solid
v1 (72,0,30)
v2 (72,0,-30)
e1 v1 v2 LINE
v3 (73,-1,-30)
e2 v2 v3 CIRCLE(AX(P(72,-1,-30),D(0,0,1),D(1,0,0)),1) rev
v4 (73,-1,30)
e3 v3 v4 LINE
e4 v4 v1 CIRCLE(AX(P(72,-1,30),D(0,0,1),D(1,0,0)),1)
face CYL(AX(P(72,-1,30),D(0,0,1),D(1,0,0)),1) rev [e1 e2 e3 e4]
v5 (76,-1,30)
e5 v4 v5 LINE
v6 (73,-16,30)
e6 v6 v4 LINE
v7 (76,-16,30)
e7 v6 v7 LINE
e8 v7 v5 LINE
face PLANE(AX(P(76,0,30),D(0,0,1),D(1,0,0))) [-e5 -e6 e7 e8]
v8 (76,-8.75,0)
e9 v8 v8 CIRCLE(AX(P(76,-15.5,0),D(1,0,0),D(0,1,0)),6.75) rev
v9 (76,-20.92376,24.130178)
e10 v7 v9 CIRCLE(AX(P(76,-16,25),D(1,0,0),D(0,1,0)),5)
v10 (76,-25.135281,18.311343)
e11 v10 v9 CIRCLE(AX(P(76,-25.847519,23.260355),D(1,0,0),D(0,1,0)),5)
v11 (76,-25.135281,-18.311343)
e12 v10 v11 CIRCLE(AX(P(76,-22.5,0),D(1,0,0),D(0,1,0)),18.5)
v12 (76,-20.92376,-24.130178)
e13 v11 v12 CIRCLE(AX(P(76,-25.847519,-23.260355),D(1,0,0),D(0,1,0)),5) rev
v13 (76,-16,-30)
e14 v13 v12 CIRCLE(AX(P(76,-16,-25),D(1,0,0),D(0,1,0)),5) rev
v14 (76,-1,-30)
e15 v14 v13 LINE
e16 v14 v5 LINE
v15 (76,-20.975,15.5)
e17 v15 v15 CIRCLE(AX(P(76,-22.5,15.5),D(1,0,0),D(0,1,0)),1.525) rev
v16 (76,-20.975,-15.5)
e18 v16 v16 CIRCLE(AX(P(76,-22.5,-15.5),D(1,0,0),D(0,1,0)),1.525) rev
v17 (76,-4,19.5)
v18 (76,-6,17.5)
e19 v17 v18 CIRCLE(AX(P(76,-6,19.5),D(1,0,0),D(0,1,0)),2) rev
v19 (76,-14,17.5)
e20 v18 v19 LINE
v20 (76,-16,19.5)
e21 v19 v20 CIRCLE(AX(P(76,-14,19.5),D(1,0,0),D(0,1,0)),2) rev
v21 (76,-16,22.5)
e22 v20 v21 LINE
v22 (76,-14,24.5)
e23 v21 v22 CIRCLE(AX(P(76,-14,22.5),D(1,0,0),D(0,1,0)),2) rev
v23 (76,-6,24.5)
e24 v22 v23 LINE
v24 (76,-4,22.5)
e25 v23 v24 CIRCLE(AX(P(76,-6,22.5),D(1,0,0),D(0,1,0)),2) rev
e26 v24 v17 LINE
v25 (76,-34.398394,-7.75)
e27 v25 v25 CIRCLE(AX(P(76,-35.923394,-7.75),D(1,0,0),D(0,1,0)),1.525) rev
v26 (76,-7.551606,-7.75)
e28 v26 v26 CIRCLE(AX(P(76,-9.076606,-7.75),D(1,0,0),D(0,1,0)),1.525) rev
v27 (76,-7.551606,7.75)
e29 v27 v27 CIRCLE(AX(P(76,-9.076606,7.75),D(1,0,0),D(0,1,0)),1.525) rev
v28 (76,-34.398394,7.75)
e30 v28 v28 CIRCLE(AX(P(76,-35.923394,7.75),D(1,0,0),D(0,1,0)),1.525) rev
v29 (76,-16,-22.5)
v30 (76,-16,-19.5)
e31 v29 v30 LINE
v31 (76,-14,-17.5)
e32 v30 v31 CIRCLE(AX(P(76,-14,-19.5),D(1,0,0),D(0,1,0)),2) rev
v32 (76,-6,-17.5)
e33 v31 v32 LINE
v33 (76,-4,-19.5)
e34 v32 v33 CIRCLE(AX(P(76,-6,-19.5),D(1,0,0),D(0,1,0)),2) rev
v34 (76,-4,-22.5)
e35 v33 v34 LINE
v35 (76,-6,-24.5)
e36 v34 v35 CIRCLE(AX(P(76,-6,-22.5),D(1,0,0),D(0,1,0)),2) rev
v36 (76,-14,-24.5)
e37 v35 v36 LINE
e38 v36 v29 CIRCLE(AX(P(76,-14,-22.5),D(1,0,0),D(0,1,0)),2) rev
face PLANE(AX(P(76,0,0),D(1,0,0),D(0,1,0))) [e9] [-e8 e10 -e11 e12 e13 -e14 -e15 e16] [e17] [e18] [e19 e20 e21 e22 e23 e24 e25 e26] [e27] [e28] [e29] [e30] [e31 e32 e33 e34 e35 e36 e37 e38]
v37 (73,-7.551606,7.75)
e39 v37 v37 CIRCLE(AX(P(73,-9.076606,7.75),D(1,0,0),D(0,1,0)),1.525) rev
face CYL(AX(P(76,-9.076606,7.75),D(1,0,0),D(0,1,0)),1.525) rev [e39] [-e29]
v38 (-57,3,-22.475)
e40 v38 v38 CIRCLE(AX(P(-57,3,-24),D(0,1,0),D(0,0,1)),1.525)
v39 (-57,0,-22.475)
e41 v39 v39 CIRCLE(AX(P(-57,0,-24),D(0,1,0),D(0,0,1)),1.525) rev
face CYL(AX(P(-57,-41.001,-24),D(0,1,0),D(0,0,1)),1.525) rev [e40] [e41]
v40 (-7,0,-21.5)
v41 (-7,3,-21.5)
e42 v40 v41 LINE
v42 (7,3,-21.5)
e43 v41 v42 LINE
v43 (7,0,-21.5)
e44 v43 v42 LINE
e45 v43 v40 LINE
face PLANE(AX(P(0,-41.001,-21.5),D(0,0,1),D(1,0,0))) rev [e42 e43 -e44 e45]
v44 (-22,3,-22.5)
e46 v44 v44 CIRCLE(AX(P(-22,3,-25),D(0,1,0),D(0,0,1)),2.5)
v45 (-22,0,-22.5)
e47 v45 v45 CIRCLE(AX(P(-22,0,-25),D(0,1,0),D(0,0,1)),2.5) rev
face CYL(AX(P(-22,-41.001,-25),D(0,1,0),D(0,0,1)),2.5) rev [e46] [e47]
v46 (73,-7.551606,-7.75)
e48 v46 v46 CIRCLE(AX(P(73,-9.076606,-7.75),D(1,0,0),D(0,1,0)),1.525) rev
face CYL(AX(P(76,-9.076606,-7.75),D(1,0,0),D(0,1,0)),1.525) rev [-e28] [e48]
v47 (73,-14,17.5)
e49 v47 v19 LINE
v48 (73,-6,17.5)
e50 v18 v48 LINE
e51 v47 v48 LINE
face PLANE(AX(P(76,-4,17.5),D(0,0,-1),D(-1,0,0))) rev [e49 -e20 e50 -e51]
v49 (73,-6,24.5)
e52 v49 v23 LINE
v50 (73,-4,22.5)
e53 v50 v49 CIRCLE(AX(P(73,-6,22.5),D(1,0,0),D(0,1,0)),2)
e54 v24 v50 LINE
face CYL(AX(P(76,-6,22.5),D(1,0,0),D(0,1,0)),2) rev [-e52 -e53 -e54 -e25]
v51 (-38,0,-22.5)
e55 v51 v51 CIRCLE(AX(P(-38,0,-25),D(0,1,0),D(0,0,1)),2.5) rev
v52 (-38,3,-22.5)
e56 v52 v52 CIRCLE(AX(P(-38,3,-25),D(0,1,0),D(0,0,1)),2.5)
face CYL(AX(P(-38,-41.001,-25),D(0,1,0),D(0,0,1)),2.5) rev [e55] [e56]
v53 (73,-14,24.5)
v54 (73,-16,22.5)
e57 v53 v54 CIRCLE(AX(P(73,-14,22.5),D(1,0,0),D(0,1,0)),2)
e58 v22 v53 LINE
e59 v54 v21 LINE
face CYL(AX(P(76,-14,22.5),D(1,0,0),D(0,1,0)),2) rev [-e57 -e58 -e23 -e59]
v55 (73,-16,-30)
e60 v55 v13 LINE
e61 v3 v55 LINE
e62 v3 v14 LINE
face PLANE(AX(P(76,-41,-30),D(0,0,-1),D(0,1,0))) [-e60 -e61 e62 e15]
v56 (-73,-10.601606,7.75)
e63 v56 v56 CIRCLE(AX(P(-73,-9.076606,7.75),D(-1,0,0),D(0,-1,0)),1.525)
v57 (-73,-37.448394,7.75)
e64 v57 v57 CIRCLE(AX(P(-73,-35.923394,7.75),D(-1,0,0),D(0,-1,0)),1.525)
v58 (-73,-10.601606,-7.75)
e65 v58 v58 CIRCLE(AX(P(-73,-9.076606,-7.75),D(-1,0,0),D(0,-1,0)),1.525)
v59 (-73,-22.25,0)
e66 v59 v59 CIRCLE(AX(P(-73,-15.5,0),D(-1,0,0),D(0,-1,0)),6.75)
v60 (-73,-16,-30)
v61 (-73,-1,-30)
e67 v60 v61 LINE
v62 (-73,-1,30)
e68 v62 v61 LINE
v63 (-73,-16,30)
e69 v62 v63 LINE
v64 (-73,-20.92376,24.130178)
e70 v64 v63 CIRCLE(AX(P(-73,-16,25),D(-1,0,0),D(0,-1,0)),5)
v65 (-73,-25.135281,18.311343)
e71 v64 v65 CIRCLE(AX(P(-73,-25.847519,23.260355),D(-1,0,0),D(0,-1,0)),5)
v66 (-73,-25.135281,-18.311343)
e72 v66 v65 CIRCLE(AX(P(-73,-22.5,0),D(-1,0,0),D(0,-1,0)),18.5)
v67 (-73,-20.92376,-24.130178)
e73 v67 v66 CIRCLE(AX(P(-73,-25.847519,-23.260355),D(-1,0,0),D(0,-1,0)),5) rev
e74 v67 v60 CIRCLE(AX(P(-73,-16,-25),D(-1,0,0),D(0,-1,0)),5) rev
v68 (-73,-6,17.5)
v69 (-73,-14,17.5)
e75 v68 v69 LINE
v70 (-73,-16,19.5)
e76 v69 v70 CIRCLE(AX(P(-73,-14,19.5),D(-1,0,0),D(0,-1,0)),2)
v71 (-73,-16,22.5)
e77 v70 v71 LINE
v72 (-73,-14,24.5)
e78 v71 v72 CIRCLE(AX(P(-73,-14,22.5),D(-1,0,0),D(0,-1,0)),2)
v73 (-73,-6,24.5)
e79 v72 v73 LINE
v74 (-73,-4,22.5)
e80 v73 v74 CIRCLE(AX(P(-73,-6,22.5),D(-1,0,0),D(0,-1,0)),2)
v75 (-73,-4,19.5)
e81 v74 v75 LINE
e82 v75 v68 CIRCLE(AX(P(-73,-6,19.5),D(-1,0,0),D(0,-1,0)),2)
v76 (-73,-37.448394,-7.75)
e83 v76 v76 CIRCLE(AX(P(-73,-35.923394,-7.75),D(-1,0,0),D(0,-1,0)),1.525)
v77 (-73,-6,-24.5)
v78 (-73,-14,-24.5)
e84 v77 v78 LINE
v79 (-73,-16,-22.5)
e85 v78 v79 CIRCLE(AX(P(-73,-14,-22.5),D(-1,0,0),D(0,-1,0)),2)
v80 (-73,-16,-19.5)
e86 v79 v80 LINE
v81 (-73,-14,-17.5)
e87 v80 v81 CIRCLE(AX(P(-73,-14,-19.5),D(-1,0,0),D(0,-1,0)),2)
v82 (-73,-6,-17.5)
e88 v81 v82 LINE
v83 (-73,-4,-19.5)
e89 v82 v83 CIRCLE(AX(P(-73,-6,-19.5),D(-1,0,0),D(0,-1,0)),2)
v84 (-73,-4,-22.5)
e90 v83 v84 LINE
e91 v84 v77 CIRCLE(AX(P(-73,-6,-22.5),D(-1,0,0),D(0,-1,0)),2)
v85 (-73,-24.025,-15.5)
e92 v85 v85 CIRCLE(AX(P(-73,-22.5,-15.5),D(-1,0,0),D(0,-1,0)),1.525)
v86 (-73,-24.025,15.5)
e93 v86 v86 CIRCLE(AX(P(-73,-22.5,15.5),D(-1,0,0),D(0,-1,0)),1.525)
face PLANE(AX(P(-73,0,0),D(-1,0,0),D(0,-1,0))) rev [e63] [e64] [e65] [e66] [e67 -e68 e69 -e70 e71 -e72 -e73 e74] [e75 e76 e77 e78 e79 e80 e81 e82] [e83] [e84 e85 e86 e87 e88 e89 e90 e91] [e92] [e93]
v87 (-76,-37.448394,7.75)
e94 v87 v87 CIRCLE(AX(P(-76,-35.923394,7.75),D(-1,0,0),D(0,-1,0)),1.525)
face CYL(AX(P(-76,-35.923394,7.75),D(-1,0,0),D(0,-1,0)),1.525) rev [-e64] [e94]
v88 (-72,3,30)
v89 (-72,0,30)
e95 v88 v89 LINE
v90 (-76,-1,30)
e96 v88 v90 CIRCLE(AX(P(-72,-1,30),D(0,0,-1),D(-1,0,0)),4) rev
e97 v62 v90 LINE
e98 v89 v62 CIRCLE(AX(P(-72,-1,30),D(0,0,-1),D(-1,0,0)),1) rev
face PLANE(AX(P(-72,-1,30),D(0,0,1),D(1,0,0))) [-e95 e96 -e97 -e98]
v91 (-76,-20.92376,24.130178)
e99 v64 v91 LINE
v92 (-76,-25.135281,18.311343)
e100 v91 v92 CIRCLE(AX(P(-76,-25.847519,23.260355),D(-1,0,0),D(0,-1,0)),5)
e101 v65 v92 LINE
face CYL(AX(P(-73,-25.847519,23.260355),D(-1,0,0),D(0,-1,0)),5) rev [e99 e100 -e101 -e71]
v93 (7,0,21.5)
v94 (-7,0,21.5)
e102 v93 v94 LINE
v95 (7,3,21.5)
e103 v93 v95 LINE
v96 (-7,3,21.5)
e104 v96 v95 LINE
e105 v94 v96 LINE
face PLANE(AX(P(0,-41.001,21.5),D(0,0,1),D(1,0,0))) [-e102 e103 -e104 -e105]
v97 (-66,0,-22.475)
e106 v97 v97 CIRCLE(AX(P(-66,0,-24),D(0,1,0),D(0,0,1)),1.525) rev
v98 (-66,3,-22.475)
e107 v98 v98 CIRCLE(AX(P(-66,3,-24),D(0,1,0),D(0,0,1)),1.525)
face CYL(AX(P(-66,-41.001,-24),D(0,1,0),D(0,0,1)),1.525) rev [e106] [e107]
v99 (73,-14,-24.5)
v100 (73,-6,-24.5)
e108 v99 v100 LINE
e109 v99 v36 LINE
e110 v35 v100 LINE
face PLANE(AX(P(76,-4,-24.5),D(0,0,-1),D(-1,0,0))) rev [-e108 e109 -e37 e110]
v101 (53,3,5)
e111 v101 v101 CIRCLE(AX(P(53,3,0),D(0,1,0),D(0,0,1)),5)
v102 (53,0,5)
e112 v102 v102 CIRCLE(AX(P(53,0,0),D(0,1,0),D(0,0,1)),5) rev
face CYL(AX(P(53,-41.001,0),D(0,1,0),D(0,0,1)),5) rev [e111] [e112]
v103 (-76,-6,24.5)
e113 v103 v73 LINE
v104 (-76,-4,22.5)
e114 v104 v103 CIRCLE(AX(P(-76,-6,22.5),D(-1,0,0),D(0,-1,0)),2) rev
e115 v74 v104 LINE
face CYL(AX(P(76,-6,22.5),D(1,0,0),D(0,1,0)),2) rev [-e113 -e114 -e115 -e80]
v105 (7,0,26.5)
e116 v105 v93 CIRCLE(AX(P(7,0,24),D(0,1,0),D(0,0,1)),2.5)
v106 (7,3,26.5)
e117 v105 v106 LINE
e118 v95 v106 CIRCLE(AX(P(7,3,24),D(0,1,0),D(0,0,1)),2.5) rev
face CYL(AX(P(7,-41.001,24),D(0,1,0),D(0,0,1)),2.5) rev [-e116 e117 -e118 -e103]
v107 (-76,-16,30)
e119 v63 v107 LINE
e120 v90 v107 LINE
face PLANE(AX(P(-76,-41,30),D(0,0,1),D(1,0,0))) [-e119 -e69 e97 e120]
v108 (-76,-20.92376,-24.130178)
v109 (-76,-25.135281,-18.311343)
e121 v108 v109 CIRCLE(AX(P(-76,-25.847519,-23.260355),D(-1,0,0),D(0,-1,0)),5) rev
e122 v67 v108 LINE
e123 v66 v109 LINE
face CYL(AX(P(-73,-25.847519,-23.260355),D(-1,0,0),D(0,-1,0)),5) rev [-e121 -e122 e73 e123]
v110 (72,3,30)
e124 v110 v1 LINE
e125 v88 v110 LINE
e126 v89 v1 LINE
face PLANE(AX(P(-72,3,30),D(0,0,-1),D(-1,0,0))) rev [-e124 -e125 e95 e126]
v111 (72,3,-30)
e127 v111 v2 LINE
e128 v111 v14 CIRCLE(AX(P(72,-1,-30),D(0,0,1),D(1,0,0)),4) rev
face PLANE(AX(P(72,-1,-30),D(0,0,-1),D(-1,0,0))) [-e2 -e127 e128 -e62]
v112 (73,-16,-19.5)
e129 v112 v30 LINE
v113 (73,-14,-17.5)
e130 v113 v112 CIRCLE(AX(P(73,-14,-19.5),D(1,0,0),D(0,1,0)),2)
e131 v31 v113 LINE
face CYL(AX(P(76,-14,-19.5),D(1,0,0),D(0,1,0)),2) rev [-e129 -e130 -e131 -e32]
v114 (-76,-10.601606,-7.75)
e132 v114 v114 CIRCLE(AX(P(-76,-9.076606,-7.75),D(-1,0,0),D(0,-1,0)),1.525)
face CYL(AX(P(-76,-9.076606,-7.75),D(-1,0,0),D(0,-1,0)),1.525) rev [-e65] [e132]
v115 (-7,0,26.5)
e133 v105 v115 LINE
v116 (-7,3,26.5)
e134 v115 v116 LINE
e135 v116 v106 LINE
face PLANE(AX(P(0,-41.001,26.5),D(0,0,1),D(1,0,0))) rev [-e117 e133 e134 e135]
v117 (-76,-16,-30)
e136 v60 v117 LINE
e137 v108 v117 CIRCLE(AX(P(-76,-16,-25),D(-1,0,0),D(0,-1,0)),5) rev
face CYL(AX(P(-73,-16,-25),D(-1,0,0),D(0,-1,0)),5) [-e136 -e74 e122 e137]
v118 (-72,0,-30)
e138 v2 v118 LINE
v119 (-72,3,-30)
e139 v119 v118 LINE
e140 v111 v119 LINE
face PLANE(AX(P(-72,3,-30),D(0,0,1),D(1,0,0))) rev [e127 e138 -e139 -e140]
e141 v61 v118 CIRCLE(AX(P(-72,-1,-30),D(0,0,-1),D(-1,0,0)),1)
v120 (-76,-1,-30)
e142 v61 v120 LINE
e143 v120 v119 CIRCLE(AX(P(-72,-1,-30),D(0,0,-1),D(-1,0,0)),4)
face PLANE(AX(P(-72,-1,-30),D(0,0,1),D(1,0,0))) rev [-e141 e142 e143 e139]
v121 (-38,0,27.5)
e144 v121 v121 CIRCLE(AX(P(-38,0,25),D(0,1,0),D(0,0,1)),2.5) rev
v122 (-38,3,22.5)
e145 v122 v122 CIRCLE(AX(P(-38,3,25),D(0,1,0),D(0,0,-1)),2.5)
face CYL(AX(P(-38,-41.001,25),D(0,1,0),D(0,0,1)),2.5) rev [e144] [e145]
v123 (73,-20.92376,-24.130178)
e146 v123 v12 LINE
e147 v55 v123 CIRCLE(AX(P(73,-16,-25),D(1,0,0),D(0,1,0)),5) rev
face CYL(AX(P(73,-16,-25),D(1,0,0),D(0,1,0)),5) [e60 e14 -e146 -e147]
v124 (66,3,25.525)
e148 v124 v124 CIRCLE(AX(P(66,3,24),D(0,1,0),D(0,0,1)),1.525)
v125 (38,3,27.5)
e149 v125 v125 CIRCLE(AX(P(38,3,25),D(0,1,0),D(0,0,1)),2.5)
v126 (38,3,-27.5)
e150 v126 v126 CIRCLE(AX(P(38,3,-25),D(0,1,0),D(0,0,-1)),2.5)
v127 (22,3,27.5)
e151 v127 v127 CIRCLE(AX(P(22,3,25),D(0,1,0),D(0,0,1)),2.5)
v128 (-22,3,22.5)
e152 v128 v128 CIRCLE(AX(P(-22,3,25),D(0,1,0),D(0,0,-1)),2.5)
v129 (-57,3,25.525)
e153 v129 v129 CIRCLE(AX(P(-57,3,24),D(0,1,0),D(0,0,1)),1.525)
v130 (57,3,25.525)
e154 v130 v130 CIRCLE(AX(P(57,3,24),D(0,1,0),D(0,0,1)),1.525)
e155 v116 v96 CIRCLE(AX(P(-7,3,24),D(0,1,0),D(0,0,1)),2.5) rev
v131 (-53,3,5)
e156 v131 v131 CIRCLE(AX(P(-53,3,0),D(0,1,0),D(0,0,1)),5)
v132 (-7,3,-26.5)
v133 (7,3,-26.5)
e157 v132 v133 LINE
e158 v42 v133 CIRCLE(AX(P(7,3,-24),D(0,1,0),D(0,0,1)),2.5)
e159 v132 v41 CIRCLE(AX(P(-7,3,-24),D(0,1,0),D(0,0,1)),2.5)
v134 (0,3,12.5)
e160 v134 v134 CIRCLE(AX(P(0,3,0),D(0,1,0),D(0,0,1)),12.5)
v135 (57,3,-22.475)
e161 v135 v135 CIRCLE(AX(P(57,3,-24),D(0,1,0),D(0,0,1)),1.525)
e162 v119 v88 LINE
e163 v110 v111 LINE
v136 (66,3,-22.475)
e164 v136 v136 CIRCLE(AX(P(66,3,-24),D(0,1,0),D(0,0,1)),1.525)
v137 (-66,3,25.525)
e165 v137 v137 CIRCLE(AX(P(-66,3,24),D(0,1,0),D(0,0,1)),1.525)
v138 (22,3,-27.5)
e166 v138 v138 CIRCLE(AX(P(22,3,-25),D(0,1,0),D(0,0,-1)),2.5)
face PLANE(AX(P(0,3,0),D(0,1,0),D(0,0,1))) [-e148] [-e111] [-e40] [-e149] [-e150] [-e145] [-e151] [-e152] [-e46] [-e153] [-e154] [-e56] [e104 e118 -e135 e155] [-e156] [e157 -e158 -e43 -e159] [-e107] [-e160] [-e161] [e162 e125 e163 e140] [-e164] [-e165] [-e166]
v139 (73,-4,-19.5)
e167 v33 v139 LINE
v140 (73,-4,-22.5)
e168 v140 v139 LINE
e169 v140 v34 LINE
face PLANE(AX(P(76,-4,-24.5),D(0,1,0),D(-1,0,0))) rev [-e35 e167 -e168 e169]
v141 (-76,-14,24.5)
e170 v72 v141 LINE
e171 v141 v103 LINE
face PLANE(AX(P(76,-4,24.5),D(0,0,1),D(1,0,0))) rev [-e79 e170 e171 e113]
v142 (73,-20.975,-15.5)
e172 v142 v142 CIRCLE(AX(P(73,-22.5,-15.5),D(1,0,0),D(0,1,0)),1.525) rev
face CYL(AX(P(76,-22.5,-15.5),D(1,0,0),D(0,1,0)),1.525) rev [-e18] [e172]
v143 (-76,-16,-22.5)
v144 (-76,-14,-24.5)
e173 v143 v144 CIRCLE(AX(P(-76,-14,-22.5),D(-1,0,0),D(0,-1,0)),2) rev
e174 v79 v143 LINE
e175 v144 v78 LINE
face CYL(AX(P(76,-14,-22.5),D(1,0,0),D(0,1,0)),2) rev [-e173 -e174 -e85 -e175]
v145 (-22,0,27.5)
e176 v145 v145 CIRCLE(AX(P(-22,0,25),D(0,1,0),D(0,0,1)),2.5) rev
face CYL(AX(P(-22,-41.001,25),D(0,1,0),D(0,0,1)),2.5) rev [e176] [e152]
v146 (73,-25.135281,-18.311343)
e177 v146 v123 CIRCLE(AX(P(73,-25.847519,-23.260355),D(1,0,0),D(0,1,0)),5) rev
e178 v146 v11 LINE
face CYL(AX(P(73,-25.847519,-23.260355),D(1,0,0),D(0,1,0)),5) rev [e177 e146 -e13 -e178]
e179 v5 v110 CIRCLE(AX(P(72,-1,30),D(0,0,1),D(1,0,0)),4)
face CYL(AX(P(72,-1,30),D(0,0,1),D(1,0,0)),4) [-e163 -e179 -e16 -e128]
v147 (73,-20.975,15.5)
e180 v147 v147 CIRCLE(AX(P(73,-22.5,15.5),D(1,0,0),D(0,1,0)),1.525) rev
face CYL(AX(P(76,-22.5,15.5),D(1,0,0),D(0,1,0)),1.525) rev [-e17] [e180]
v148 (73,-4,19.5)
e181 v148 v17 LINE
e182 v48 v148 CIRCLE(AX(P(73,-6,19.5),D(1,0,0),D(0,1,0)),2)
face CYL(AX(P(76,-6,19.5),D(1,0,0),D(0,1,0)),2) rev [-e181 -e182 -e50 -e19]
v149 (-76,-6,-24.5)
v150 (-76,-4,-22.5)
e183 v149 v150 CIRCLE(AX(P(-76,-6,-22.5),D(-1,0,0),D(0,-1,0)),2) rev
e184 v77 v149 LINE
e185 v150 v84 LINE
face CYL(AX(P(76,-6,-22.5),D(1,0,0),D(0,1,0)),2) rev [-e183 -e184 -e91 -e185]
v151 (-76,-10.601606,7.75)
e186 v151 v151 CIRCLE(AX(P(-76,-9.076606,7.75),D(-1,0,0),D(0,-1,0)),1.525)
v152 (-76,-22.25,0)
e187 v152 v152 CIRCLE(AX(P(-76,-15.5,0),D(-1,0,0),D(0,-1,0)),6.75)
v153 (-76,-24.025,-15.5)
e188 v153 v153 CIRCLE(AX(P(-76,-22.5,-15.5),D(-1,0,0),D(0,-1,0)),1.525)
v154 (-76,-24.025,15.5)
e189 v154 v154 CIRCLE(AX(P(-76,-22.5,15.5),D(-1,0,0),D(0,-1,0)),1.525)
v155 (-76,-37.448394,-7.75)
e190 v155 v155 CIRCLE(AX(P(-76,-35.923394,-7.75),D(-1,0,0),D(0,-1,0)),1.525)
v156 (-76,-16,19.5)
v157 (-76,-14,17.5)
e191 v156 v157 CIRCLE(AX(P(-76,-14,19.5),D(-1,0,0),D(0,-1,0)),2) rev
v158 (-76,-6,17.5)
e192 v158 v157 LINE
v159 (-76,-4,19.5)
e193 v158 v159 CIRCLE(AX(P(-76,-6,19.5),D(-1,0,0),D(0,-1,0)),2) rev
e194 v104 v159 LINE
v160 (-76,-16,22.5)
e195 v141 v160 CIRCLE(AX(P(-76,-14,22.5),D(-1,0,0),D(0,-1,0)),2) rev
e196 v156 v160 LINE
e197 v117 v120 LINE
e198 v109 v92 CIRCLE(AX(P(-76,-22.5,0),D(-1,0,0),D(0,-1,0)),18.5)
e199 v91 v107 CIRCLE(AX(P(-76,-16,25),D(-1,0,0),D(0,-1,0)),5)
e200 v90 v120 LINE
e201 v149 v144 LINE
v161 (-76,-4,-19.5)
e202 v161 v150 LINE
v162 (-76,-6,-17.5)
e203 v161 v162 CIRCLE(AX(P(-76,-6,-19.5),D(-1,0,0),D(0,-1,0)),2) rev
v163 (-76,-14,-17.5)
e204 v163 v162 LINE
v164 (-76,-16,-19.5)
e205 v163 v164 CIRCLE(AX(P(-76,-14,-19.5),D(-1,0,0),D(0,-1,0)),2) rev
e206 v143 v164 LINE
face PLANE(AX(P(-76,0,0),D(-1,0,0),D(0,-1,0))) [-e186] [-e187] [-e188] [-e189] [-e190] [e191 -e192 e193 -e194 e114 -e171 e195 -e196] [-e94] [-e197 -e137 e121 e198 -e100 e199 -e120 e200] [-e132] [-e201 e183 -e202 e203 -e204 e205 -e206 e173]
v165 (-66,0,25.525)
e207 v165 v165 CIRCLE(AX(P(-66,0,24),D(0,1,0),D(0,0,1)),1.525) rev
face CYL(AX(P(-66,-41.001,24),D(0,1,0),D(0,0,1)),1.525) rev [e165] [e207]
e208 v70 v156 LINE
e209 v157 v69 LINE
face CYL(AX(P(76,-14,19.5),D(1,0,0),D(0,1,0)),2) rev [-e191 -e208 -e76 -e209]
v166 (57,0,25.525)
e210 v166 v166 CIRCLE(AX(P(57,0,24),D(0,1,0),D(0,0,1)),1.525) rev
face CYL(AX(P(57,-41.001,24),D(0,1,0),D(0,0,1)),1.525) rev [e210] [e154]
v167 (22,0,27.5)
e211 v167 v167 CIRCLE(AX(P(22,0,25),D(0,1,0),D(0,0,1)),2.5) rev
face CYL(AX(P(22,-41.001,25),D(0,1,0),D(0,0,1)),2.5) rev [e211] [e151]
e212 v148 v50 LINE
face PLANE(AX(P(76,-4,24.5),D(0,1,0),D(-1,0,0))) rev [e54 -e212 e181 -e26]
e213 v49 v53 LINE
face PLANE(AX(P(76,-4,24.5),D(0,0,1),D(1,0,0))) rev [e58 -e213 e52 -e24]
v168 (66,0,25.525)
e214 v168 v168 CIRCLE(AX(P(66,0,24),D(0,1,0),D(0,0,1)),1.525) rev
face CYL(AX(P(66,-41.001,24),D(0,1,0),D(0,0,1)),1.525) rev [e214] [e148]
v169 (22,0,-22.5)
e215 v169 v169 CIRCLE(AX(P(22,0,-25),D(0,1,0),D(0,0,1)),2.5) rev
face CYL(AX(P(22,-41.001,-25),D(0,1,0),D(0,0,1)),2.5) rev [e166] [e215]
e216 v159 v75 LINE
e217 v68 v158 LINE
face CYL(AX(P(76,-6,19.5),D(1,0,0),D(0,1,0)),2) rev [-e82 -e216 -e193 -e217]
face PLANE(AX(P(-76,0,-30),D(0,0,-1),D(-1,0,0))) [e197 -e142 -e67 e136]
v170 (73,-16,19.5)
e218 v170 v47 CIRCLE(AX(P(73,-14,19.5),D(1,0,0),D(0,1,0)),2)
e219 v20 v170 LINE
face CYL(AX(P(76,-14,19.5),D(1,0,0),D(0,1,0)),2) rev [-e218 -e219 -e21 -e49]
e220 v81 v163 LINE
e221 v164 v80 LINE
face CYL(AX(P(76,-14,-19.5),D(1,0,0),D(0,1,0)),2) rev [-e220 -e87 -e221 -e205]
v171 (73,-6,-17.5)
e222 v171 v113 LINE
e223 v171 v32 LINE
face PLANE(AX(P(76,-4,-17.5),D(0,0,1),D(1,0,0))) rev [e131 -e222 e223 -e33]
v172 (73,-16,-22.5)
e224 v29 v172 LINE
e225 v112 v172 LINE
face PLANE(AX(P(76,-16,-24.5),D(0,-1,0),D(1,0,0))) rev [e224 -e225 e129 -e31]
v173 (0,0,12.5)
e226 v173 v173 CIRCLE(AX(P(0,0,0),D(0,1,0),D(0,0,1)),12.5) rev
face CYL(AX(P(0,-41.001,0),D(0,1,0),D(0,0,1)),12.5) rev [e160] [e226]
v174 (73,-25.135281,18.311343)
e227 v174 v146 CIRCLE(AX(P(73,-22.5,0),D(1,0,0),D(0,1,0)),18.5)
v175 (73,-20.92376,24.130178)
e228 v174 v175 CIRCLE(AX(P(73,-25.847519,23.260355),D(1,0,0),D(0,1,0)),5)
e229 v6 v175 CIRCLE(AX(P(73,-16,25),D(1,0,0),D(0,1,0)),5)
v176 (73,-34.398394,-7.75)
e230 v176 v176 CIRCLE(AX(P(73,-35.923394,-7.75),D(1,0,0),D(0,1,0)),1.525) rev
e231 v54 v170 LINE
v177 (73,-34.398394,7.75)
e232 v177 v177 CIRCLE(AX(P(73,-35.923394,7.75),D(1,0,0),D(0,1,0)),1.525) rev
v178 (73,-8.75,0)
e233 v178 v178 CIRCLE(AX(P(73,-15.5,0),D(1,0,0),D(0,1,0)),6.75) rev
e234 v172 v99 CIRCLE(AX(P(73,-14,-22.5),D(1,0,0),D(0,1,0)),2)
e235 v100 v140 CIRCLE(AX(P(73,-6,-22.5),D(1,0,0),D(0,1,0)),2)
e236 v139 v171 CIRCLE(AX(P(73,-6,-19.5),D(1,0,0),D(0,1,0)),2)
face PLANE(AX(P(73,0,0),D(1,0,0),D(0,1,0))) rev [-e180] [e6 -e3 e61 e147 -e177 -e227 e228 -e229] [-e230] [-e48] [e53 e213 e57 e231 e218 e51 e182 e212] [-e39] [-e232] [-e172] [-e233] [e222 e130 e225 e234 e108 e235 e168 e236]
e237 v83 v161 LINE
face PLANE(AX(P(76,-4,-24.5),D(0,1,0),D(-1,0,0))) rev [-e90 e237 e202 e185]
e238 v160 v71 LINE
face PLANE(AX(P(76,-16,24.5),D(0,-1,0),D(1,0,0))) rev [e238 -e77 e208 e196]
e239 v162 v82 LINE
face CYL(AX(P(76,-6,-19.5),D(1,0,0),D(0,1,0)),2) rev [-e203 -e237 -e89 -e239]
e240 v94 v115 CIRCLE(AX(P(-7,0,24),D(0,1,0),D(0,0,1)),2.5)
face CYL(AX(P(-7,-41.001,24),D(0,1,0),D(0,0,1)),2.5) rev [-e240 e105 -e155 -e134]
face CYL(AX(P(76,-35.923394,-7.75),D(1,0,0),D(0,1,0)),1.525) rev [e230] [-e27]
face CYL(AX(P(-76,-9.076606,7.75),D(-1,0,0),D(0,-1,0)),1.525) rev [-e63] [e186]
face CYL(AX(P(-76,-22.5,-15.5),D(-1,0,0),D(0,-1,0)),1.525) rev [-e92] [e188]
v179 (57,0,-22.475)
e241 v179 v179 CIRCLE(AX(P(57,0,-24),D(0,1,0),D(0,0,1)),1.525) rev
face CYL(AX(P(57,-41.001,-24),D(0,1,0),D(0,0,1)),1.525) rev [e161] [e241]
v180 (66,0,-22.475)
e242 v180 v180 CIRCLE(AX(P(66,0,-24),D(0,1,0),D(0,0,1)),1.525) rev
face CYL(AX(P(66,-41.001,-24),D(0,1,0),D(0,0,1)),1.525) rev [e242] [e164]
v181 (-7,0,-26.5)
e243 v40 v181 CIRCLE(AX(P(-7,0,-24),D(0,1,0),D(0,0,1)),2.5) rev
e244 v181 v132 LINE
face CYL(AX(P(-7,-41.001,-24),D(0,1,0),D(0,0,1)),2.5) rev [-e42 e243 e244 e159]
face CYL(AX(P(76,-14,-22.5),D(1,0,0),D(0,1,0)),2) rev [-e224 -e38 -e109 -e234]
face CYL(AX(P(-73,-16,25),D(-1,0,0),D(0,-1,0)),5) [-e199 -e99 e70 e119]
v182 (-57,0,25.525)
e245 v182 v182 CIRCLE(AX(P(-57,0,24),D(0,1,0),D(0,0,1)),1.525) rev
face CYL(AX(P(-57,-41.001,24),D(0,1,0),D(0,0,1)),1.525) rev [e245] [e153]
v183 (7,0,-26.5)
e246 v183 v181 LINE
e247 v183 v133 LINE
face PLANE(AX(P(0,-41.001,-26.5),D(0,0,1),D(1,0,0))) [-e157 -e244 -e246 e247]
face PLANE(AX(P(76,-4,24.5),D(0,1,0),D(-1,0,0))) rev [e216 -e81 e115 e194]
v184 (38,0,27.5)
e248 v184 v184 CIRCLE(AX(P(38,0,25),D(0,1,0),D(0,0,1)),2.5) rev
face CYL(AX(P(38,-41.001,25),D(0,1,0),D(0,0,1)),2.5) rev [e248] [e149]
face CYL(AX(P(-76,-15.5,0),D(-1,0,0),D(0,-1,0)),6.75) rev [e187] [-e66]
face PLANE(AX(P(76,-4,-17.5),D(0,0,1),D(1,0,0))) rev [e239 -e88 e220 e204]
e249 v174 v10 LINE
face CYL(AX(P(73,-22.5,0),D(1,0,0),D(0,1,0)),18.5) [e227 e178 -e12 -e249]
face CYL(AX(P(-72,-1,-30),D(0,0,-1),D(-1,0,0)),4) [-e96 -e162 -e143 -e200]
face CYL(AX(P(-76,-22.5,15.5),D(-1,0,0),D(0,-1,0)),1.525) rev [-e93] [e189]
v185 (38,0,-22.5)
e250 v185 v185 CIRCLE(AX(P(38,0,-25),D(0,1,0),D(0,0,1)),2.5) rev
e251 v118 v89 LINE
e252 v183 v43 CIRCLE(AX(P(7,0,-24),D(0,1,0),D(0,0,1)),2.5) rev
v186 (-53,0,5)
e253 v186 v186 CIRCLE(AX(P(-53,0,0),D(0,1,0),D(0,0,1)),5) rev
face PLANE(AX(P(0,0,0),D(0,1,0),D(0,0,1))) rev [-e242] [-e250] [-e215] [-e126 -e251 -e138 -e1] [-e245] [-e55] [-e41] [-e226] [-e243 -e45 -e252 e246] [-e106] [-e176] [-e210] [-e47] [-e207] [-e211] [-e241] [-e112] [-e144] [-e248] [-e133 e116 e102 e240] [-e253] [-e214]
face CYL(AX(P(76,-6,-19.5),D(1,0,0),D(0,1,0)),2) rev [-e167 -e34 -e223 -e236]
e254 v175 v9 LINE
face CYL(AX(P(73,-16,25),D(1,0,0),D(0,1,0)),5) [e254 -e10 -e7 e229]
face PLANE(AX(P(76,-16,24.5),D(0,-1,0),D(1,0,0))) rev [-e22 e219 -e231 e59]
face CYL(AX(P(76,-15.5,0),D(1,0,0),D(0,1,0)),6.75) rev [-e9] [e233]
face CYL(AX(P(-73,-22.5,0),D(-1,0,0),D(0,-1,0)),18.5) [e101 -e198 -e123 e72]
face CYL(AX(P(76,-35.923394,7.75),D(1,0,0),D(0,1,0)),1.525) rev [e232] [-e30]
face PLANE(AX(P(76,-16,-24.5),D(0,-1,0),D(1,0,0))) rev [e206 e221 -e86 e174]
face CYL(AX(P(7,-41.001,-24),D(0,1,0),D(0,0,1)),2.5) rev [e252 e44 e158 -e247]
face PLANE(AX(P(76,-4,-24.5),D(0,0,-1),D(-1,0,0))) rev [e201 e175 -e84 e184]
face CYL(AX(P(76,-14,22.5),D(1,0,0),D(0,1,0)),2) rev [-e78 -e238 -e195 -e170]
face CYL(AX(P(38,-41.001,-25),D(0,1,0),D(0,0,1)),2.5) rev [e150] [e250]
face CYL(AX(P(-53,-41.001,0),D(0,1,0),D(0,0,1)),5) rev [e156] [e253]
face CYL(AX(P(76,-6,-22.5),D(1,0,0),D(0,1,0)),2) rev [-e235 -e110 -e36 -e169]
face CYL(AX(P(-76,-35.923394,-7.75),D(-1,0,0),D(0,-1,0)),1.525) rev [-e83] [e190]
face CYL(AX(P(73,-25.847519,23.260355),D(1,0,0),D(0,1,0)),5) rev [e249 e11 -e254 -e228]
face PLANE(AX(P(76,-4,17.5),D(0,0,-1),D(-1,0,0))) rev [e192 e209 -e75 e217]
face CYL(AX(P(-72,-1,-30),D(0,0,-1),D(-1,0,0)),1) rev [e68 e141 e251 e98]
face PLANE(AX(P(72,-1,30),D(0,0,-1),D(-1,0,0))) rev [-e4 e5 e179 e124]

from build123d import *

# Parameters (mm, degrees)
SKETCH_1_W             = 144
SKETCH_1_H             = 60
SM_BASE_FLANGE_1_DEPTH = 3
SM_EDGE_FLANGE_1_DEPTH = 60
SM_EDGE_FLANGE_2_DEPTH = 60
CUT_EXTRUDE_1_REACH    = 162.265
SKETCH_16_R            = 1.525
SKETCH_16_R_2          = 6.75
CUT_EXTRUDE_2_REACH    = 94.801
SKETCH_19_W            = 14
SKETCH_19_H            = 5
CUT_EXTRUDE_3_REACH    = 94.801
SKETCH_22_R            = 1.525
CUT_EXTRUDE_4_REACH    = 94.801
SKETCH_25_R            = 2.5
CUT_EXTRUDE_5_REACH    = 94.801
SKETCH_28_R            = 12.5
SKETCH_28_R_2          = 5
SKETCH_29_W            = 7
SKETCH_29_H            = 12
CUT_EXTRUDE_6_DEPTH    = 161.265404876
FILLET_1_R             = 2
FILLET_2_R             = 2


# Sheet-metal steps are written as plain solids
with BuildPart() as part:
    # Sketch 1 → 基体-法兰1 (new body)
    with BuildSketch(Plane(origin=(0, 0, 0), x_dir=(1, 0, 0), z_dir=(0, 1, 0))):
        Rectangle(SKETCH_1_W, SKETCH_1_H)
    extrude(amount=SM_BASE_FLANGE_1_DEPTH)

    # 边线-法兰1 section (across the edge) → 边线-法兰1 (add)
    with BuildSketch(Plane(origin=(73, 0, -30), x_dir=(-1, 0, 0), z_dir=(0, 0, 1))):
        with BuildLine():
            Line((-3, 1), (-3, 41))
            Line((-3, 41), (0, 41))
            Line((0, 41), (0, 1))
            ThreePointArc((0, 1), (0.292893219, 0.292893219), (1, 0))
            Line((1, 0), (1, -3))
            ThreePointArc((1, -3), (-1.828427125, -1.828427125), (-3, 1))
        make_face()
    extrude(amount=SM_EDGE_FLANGE_1_DEPTH)

    # 边线-法兰2 section (across the edge) → 边线-法兰2 (add)
    with BuildSketch(Plane(origin=(-73, 0, 30), x_dir=(1, 0, 0), z_dir=(0, 0, -1))):
        with BuildLine():
            Line((-3, 1), (-3, 41))
            Line((-3, 41), (0, 41))
            Line((0, 41), (0, 1))
            ThreePointArc((0, 1), (0.292893219, 0.292893219), (1, 0))
            Line((1, 0), (1, -3))
            ThreePointArc((1, -3), (-1.828427125, -1.828427125), (-3, 1))
        make_face()
    extrude(amount=SM_EDGE_FLANGE_2_DEPTH)

    # 切除-拉伸1: up to this face of the body (flat: up to its plane)
    cut_extrude_1_end = Plane(part.part.faces().sort_by_distance((76, -21, 0))[0])
    # 草图16 → 切除-拉伸1 (cut, up to the picked face)
    with BuildSketch(Plane.ZY.offset(76), mode=Mode.PRIVATE) as cut_extrude_1_sk1:
        with Locations(Location((15.5, -22.5, 0), (0, 0, 90))):
            Circle(SKETCH_16_R)
    cut_extrude_1_tool1 = split(extrude(cut_extrude_1_sk1.sketch, amount=-CUT_EXTRUDE_1_REACH, mode=Mode.PRIVATE), bisect_by=cut_extrude_1_end, keep=Keep.BOTH, mode=Mode.PRIVATE)
    # 草图16 → 切除-拉伸1 (cut, up to the picked face)
    with BuildSketch(Plane.ZY.offset(76), mode=Mode.PRIVATE) as cut_extrude_1_sk2:
        with Locations(Location((7.75, -35.923393759, 0), (0, 0, 90))):
            Circle(SKETCH_16_R)
    cut_extrude_1_tool2 = split(extrude(cut_extrude_1_sk2.sketch, amount=-CUT_EXTRUDE_1_REACH, mode=Mode.PRIVATE), bisect_by=cut_extrude_1_end, keep=Keep.BOTH, mode=Mode.PRIVATE)
    # 草图16 → 切除-拉伸1 (cut, up to the picked face)
    with BuildSketch(Plane.ZY.offset(76), mode=Mode.PRIVATE) as cut_extrude_1_sk3:
        with BuildLine():
            ThreePointArc((24.130177502, -20.923759623), (20.328772761, -21.797108704), (18.311343301, -25.135281108))
            ThreePointArc((18.311343301, -25.135281108), (12.113985709, -36.482179739), (0, -41))
            Line((0, -41), (30, -41))
            Line((30, -41), (30, -16))
            ThreePointArc((30, -16), (28.213322853, -19.830738342), (24.130177502, -20.923759623))
        make_face()
    cut_extrude_1_tool3 = split(extrude(cut_extrude_1_sk3.sketch, amount=-CUT_EXTRUDE_1_REACH, mode=Mode.PRIVATE), bisect_by=cut_extrude_1_end, keep=Keep.BOTH, mode=Mode.PRIVATE)
    # 草图16 → 切除-拉伸1 (cut, up to the picked face)
    with BuildSketch(Plane.ZY.offset(76), mode=Mode.PRIVATE) as cut_extrude_1_sk4:
        with Locations(Location((-15.5, -22.5, 0), (0, 0, 90))):
            Circle(SKETCH_16_R)
    cut_extrude_1_tool4 = split(extrude(cut_extrude_1_sk4.sketch, amount=-CUT_EXTRUDE_1_REACH, mode=Mode.PRIVATE), bisect_by=cut_extrude_1_end, keep=Keep.BOTH, mode=Mode.PRIVATE)
    # 草图16 → 切除-拉伸1 (cut, up to the picked face)
    with BuildSketch(Plane.ZY.offset(76), mode=Mode.PRIVATE) as cut_extrude_1_sk5:
        with Locations(Location((0, -15.5, 0), (0, 0, 90))):
            Circle(SKETCH_16_R_2)
    cut_extrude_1_tool5 = split(extrude(cut_extrude_1_sk5.sketch, amount=-CUT_EXTRUDE_1_REACH, mode=Mode.PRIVATE), bisect_by=cut_extrude_1_end, keep=Keep.BOTH, mode=Mode.PRIVATE)
    # 草图16 → 切除-拉伸1 (cut, up to the picked face)
    with BuildSketch(Plane.ZY.offset(76), mode=Mode.PRIVATE) as cut_extrude_1_sk6:
        with Locations(Location((7.75, -9.076606241, 0), (0, 0, 90))):
            Circle(SKETCH_16_R)
    cut_extrude_1_tool6 = split(extrude(cut_extrude_1_sk6.sketch, amount=-CUT_EXTRUDE_1_REACH, mode=Mode.PRIVATE), bisect_by=cut_extrude_1_end, keep=Keep.BOTH, mode=Mode.PRIVATE)
    # 草图16 → 切除-拉伸1 (cut, up to the picked face)
    with BuildSketch(Plane.ZY.offset(76), mode=Mode.PRIVATE) as cut_extrude_1_sk7:
        with BuildLine():
            Line((-30, -41), (0, -41))
            ThreePointArc((0, -41), (-12.113985709, -36.482179739), (-18.311343301, -25.135281108))
            ThreePointArc((-18.311343301, -25.135281108), (-20.328772761, -21.797108704), (-24.130177502, -20.923759623))
            ThreePointArc((-24.130177502, -20.923759623), (-28.213322853, -19.830738342), (-30, -16))
            Line((-30, -16), (-30, -41))
        make_face()
    cut_extrude_1_tool7 = split(extrude(cut_extrude_1_sk7.sketch, amount=-CUT_EXTRUDE_1_REACH, mode=Mode.PRIVATE), bisect_by=cut_extrude_1_end, keep=Keep.BOTH, mode=Mode.PRIVATE)
    # 草图16 → 切除-拉伸1 (cut, up to the picked face)
    with BuildSketch(Plane.ZY.offset(76), mode=Mode.PRIVATE) as cut_extrude_1_sk8:
        with Locations(Location((-7.75, -35.923393759, 0), (0, 0, 90))):
            Circle(SKETCH_16_R)
    cut_extrude_1_tool8 = split(extrude(cut_extrude_1_sk8.sketch, amount=-CUT_EXTRUDE_1_REACH, mode=Mode.PRIVATE), bisect_by=cut_extrude_1_end, keep=Keep.BOTH, mode=Mode.PRIVATE)
    # 草图16 → 切除-拉伸1 (cut, up to the picked face)
    with BuildSketch(Plane.ZY.offset(76), mode=Mode.PRIVATE) as cut_extrude_1_sk9:
        with Locations(Location((-7.75, -9.076606241, 0), (0, 0, 90))):
            Circle(SKETCH_16_R)
    cut_extrude_1_tool9 = split(extrude(cut_extrude_1_sk9.sketch, amount=-CUT_EXTRUDE_1_REACH, mode=Mode.PRIVATE), bisect_by=cut_extrude_1_end, keep=Keep.BOTH, mode=Mode.PRIVATE)
    add(cut_extrude_1_tool1.solids().sort_by(Axis((-76, -22.5, 15.5), (1, 0, 0)))[0], mode=Mode.SUBTRACT)
    add(cut_extrude_1_tool2.solids().sort_by(Axis((-76, -35.923394, 7.75), (1, 0, 0)))[0], mode=Mode.SUBTRACT)
    add(cut_extrude_1_tool3.solids().sort_by(Axis((-76, -32.323593, 22.013669), (1, 0, 0)))[0], mode=Mode.SUBTRACT)
    add(cut_extrude_1_tool4.solids().sort_by(Axis((-76, -22.5, -15.5), (1, 0, 0)))[0], mode=Mode.SUBTRACT)
    add(cut_extrude_1_tool5.solids().sort_by(Axis((-76, -15.5, 0), (1, 0, 0)))[0], mode=Mode.SUBTRACT)
    add(cut_extrude_1_tool6.solids().sort_by(Axis((-76, -9.076606, 7.75), (1, 0, 0)))[0], mode=Mode.SUBTRACT)
    add(cut_extrude_1_tool7.solids().sort_by(Axis((-76, -32.323593, -22.013669), (1, 0, 0)))[0], mode=Mode.SUBTRACT)
    add(cut_extrude_1_tool8.solids().sort_by(Axis((-76, -35.923394, -7.75), (1, 0, 0)))[0], mode=Mode.SUBTRACT)
    add(cut_extrude_1_tool9.solids().sort_by(Axis((-76, -9.076606, -7.75), (1, 0, 0)))[0], mode=Mode.SUBTRACT)

    # 草图19 → 切除-拉伸2 (cut, up to next)
    with BuildSketch(Plane(origin=(0, 3, 0), x_dir=(1, 0, 0), z_dir=(0, 1, 0)), mode=Mode.PRIVATE) as cut_extrude_2_sk1:
        with BuildLine():
            ThreePointArc((-7, -26.5), (-9.5, -24), (-7, -21.5))
            Line((-7, -21.5), (-7, -26.5))
        make_face()
    cut_extrude_2_tool1 = extrude(cut_extrude_2_sk1.sketch, amount=-CUT_EXTRUDE_2_REACH, mode=Mode.PRIVATE) & part.part
    # 草图19 → 切除-拉伸2 (cut, up to next)
    with BuildSketch(Plane(origin=(0, 3, 0), x_dir=(1, 0, 0), z_dir=(0, 1, 0)), mode=Mode.PRIVATE) as cut_extrude_2_sk2:
        with Locations((0, -24)):
            Rectangle(SKETCH_19_W, SKETCH_19_H)
    cut_extrude_2_tool2 = extrude(cut_extrude_2_sk2.sketch, amount=-CUT_EXTRUDE_2_REACH, mode=Mode.PRIVATE) & part.part
    # 草图19 → 切除-拉伸2 (cut, up to next)
    with BuildSketch(Plane(origin=(0, 3, 0), x_dir=(1, 0, 0), z_dir=(0, 1, 0)), mode=Mode.PRIVATE) as cut_extrude_2_sk3:
        with BuildLine():
            ThreePointArc((7, -21.5), (9.5, -24), (7, -26.5))
            Line((7, -26.5), (7, -21.5))
        make_face()
    cut_extrude_2_tool3 = extrude(cut_extrude_2_sk3.sketch, amount=-CUT_EXTRUDE_2_REACH, mode=Mode.PRIVATE) & part.part
    # 草图19 → 切除-拉伸2 (cut, up to next)
    with BuildSketch(Plane(origin=(0, 3, 0), x_dir=(1, 0, 0), z_dir=(0, 1, 0)), mode=Mode.PRIVATE) as cut_extrude_2_sk4:
        with BuildLine():
            Line((-7, 21.5), (-7, 26.5))
            ThreePointArc((-7, 26.5), (-9.5, 24), (-7, 21.5))
        make_face()
    cut_extrude_2_tool4 = extrude(cut_extrude_2_sk4.sketch, amount=-CUT_EXTRUDE_2_REACH, mode=Mode.PRIVATE) & part.part
    # 草图19 → 切除-拉伸2 (cut, up to next)
    with BuildSketch(Plane(origin=(0, 3, 0), x_dir=(1, 0, 0), z_dir=(0, 1, 0)), mode=Mode.PRIVATE) as cut_extrude_2_sk5:
        with Locations((0, 24)):
            Rectangle(SKETCH_19_W, SKETCH_19_H)
    cut_extrude_2_tool5 = extrude(cut_extrude_2_sk5.sketch, amount=-CUT_EXTRUDE_2_REACH, mode=Mode.PRIVATE) & part.part
    # 草图19 → 切除-拉伸2 (cut, up to next)
    with BuildSketch(Plane(origin=(0, 3, 0), x_dir=(1, 0, 0), z_dir=(0, 1, 0)), mode=Mode.PRIVATE) as cut_extrude_2_sk6:
        with BuildLine():
            Line((7, 21.5), (7, 26.5))
            ThreePointArc((7, 26.5), (9.5, 24), (7, 21.5))
        make_face()
    cut_extrude_2_tool6 = extrude(cut_extrude_2_sk6.sketch, amount=-CUT_EXTRUDE_2_REACH, mode=Mode.PRIVATE) & part.part
    add(cut_extrude_2_tool1.solids().sort_by_distance((-8.061033, 3, 24))[0], mode=Mode.SUBTRACT)
    add(cut_extrude_2_tool2.solids().sort_by_distance((0, 3, 24))[0], mode=Mode.SUBTRACT)
    add(cut_extrude_2_tool3.solids().sort_by_distance((8.061033, 3, 24))[0], mode=Mode.SUBTRACT)
    add(cut_extrude_2_tool4.solids().sort_by_distance((-8.061033, 3, -24))[0], mode=Mode.SUBTRACT)
    add(cut_extrude_2_tool5.solids().sort_by_distance((0, 3, -24))[0], mode=Mode.SUBTRACT)
    add(cut_extrude_2_tool6.solids().sort_by_distance((8.061033, 3, -24))[0], mode=Mode.SUBTRACT)

    # 草图22 → 切除-拉伸3 (cut, up to next)
    with BuildSketch(Plane(origin=(0, 3, 0), x_dir=(1, 0, 0), z_dir=(0, 1, 0)), mode=Mode.PRIVATE) as cut_extrude_3_sk1:
        with Locations(Location((-66, 24, 0), (0, 0, 270))):
            Circle(SKETCH_22_R)
    cut_extrude_3_tool1 = extrude(cut_extrude_3_sk1.sketch, amount=-CUT_EXTRUDE_3_REACH, mode=Mode.PRIVATE) & part.part
    # 草图22 → 切除-拉伸3 (cut, up to next)
    with BuildSketch(Plane(origin=(0, 3, 0), x_dir=(1, 0, 0), z_dir=(0, 1, 0)), mode=Mode.PRIVATE) as cut_extrude_3_sk2:
        with Locations(Location((-66, -24, 0), (0, 0, 270))):
            Circle(SKETCH_22_R)
    cut_extrude_3_tool2 = extrude(cut_extrude_3_sk2.sketch, amount=-CUT_EXTRUDE_3_REACH, mode=Mode.PRIVATE) & part.part
    # 草图22 → 切除-拉伸3 (cut, up to next)
    with BuildSketch(Plane(origin=(0, 3, 0), x_dir=(1, 0, 0), z_dir=(0, 1, 0)), mode=Mode.PRIVATE) as cut_extrude_3_sk3:
        with Locations(Location((66, 24, 0), (0, 0, 270))):
            Circle(SKETCH_22_R)
    cut_extrude_3_tool3 = extrude(cut_extrude_3_sk3.sketch, amount=-CUT_EXTRUDE_3_REACH, mode=Mode.PRIVATE) & part.part
    # 草图22 → 切除-拉伸3 (cut, up to next)
    with BuildSketch(Plane(origin=(0, 3, 0), x_dir=(1, 0, 0), z_dir=(0, 1, 0)), mode=Mode.PRIVATE) as cut_extrude_3_sk4:
        with Locations(Location((66, -24, 0), (0, 0, 270))):
            Circle(SKETCH_22_R)
    cut_extrude_3_tool4 = extrude(cut_extrude_3_sk4.sketch, amount=-CUT_EXTRUDE_3_REACH, mode=Mode.PRIVATE) & part.part
    # 草图22 → 切除-拉伸3 (cut, up to next)
    with BuildSketch(Plane(origin=(0, 3, 0), x_dir=(1, 0, 0), z_dir=(0, 1, 0)), mode=Mode.PRIVATE) as cut_extrude_3_sk5:
        with Locations(Location((-57, 24, 0), (0, 0, 270))):
            Circle(SKETCH_22_R)
    cut_extrude_3_tool5 = extrude(cut_extrude_3_sk5.sketch, amount=-CUT_EXTRUDE_3_REACH, mode=Mode.PRIVATE) & part.part
    # 草图22 → 切除-拉伸3 (cut, up to next)
    with BuildSketch(Plane(origin=(0, 3, 0), x_dir=(1, 0, 0), z_dir=(0, 1, 0)), mode=Mode.PRIVATE) as cut_extrude_3_sk6:
        with Locations(Location((-57, -24, 0), (0, 0, 270))):
            Circle(SKETCH_22_R)
    cut_extrude_3_tool6 = extrude(cut_extrude_3_sk6.sketch, amount=-CUT_EXTRUDE_3_REACH, mode=Mode.PRIVATE) & part.part
    # 草图22 → 切除-拉伸3 (cut, up to next)
    with BuildSketch(Plane(origin=(0, 3, 0), x_dir=(1, 0, 0), z_dir=(0, 1, 0)), mode=Mode.PRIVATE) as cut_extrude_3_sk7:
        with Locations(Location((57, 24, 0), (0, 0, 270))):
            Circle(SKETCH_22_R)
    cut_extrude_3_tool7 = extrude(cut_extrude_3_sk7.sketch, amount=-CUT_EXTRUDE_3_REACH, mode=Mode.PRIVATE) & part.part
    # 草图22 → 切除-拉伸3 (cut, up to next)
    with BuildSketch(Plane(origin=(0, 3, 0), x_dir=(1, 0, 0), z_dir=(0, 1, 0)), mode=Mode.PRIVATE) as cut_extrude_3_sk8:
        with Locations(Location((57, -24, 0), (0, 0, 270))):
            Circle(SKETCH_22_R)
    cut_extrude_3_tool8 = extrude(cut_extrude_3_sk8.sketch, amount=-CUT_EXTRUDE_3_REACH, mode=Mode.PRIVATE) & part.part
    add(cut_extrude_3_tool1.solids().sort_by_distance((-66, 3, -24))[0], mode=Mode.SUBTRACT)
    add(cut_extrude_3_tool2.solids().sort_by_distance((-66, 3, 24))[0], mode=Mode.SUBTRACT)
    add(cut_extrude_3_tool3.solids().sort_by_distance((66, 3, -24))[0], mode=Mode.SUBTRACT)
    add(cut_extrude_3_tool4.solids().sort_by_distance((66, 3, 24))[0], mode=Mode.SUBTRACT)
    add(cut_extrude_3_tool5.solids().sort_by_distance((-57, 3, -24))[0], mode=Mode.SUBTRACT)
    add(cut_extrude_3_tool6.solids().sort_by_distance((-57, 3, 24))[0], mode=Mode.SUBTRACT)
    add(cut_extrude_3_tool7.solids().sort_by_distance((57, 3, -24))[0], mode=Mode.SUBTRACT)
    add(cut_extrude_3_tool8.solids().sort_by_distance((57, 3, 24))[0], mode=Mode.SUBTRACT)

    # 草图25 → 切除-拉伸4 (cut, up to next)
    with BuildSketch(Plane(origin=(0, 3, 0), x_dir=(1, 0, 0), z_dir=(0, 1, 0)), mode=Mode.PRIVATE) as cut_extrude_4_sk1:
        with Locations(Location((-38, 25, 0), (0, 0, 270))):
            Circle(SKETCH_25_R)
    cut_extrude_4_tool1 = extrude(cut_extrude_4_sk1.sketch, amount=-CUT_EXTRUDE_4_REACH, mode=Mode.PRIVATE) & part.part
    # 草图25 → 切除-拉伸4 (cut, up to next)
    with BuildSketch(Plane(origin=(0, 3, 0), x_dir=(1, 0, 0), z_dir=(0, 1, 0)), mode=Mode.PRIVATE) as cut_extrude_4_sk2:
        with Locations(Location((-22, 25, 0), (0, 0, 270))):
            Circle(SKETCH_25_R)
    cut_extrude_4_tool2 = extrude(cut_extrude_4_sk2.sketch, amount=-CUT_EXTRUDE_4_REACH, mode=Mode.PRIVATE) & part.part
    # 草图25 → 切除-拉伸4 (cut, up to next)
    with BuildSketch(Plane(origin=(0, 3, 0), x_dir=(1, 0, 0), z_dir=(0, 1, 0)), mode=Mode.PRIVATE) as cut_extrude_4_sk3:
        with Locations(Location((22, 25, 0), (0, 0, 270))):
            Circle(SKETCH_25_R)
    cut_extrude_4_tool3 = extrude(cut_extrude_4_sk3.sketch, amount=-CUT_EXTRUDE_4_REACH, mode=Mode.PRIVATE) & part.part
    # 草图25 → 切除-拉伸4 (cut, up to next)
    with BuildSketch(Plane(origin=(0, 3, 0), x_dir=(1, 0, 0), z_dir=(0, 1, 0)), mode=Mode.PRIVATE) as cut_extrude_4_sk4:
        with Locations(Location((38, 25, 0), (0, 0, 270))):
            Circle(SKETCH_25_R)
    cut_extrude_4_tool4 = extrude(cut_extrude_4_sk4.sketch, amount=-CUT_EXTRUDE_4_REACH, mode=Mode.PRIVATE) & part.part
    # 草图25 → 切除-拉伸4 (cut, up to next)
    with BuildSketch(Plane(origin=(0, 3, 0), x_dir=(1, 0, 0), z_dir=(0, 1, 0)), mode=Mode.PRIVATE) as cut_extrude_4_sk5:
        with Locations(Location((38, -25, 0), (0, 0, 270))):
            Circle(SKETCH_25_R)
    cut_extrude_4_tool5 = extrude(cut_extrude_4_sk5.sketch, amount=-CUT_EXTRUDE_4_REACH, mode=Mode.PRIVATE) & part.part
    # 草图25 → 切除-拉伸4 (cut, up to next)
    with BuildSketch(Plane(origin=(0, 3, 0), x_dir=(1, 0, 0), z_dir=(0, 1, 0)), mode=Mode.PRIVATE) as cut_extrude_4_sk6:
        with Locations(Location((22, -25, 0), (0, 0, 270))):
            Circle(SKETCH_25_R)
    cut_extrude_4_tool6 = extrude(cut_extrude_4_sk6.sketch, amount=-CUT_EXTRUDE_4_REACH, mode=Mode.PRIVATE) & part.part
    # 草图25 → 切除-拉伸4 (cut, up to next)
    with BuildSketch(Plane(origin=(0, 3, 0), x_dir=(1, 0, 0), z_dir=(0, 1, 0)), mode=Mode.PRIVATE) as cut_extrude_4_sk7:
        with Locations(Location((-22, -25, 0), (0, 0, 270))):
            Circle(SKETCH_25_R)
    cut_extrude_4_tool7 = extrude(cut_extrude_4_sk7.sketch, amount=-CUT_EXTRUDE_4_REACH, mode=Mode.PRIVATE) & part.part
    # 草图25 → 切除-拉伸4 (cut, up to next)
    with BuildSketch(Plane(origin=(0, 3, 0), x_dir=(1, 0, 0), z_dir=(0, 1, 0)), mode=Mode.PRIVATE) as cut_extrude_4_sk8:
        with Locations(Location((-38, -25, 0), (0, 0, 270))):
            Circle(SKETCH_25_R)
    cut_extrude_4_tool8 = extrude(cut_extrude_4_sk8.sketch, amount=-CUT_EXTRUDE_4_REACH, mode=Mode.PRIVATE) & part.part
    add(cut_extrude_4_tool1.solids().sort_by_distance((-38, 3, -25))[0], mode=Mode.SUBTRACT)
    add(cut_extrude_4_tool2.solids().sort_by_distance((-22, 3, -25))[0], mode=Mode.SUBTRACT)
    add(cut_extrude_4_tool3.solids().sort_by_distance((22, 3, -25))[0], mode=Mode.SUBTRACT)
    add(cut_extrude_4_tool4.solids().sort_by_distance((38, 3, -25))[0], mode=Mode.SUBTRACT)
    add(cut_extrude_4_tool5.solids().sort_by_distance((38, 3, 25))[0], mode=Mode.SUBTRACT)
    add(cut_extrude_4_tool6.solids().sort_by_distance((22, 3, 25))[0], mode=Mode.SUBTRACT)
    add(cut_extrude_4_tool7.solids().sort_by_distance((-22, 3, 25))[0], mode=Mode.SUBTRACT)
    add(cut_extrude_4_tool8.solids().sort_by_distance((-38, 3, 25))[0], mode=Mode.SUBTRACT)

    # 草图28 → 切除-拉伸5 (cut, up to next)
    with BuildSketch(Plane(origin=(0, 3, 0), x_dir=(1, 0, 0), z_dir=(0, 1, 0)), mode=Mode.PRIVATE) as cut_extrude_5_sk1:
        with Locations(Location((0, 0, 0), (0, 0, 270))):
            Circle(SKETCH_28_R)
    cut_extrude_5_tool1 = extrude(cut_extrude_5_sk1.sketch, amount=-CUT_EXTRUDE_5_REACH, mode=Mode.PRIVATE) & part.part
    # 草图28 → 切除-拉伸5 (cut, up to next)
    with BuildSketch(Plane(origin=(0, 3, 0), x_dir=(1, 0, 0), z_dir=(0, 1, 0)), mode=Mode.PRIVATE) as cut_extrude_5_sk2:
        with Locations(Location((-53, 0, 0), (0, 0, 270))):
            Circle(SKETCH_28_R_2)
    cut_extrude_5_tool2 = extrude(cut_extrude_5_sk2.sketch, amount=-CUT_EXTRUDE_5_REACH, mode=Mode.PRIVATE) & part.part
    # 草图28 → 切除-拉伸5 (cut, up to next)
    with BuildSketch(Plane(origin=(0, 3, 0), x_dir=(1, 0, 0), z_dir=(0, 1, 0)), mode=Mode.PRIVATE) as cut_extrude_5_sk3:
        with Locations(Location((53, 0, 0), (0, 0, 270))):
            Circle(SKETCH_28_R_2)
    cut_extrude_5_tool3 = extrude(cut_extrude_5_sk3.sketch, amount=-CUT_EXTRUDE_5_REACH, mode=Mode.PRIVATE) & part.part
    add(cut_extrude_5_tool1.solids().sort_by_distance((0, 3, 0))[0], mode=Mode.SUBTRACT)
    add(cut_extrude_5_tool2.solids().sort_by_distance((-53, 3, 0))[0], mode=Mode.SUBTRACT)
    add(cut_extrude_5_tool3.solids().sort_by_distance((53, 3, 0))[0], mode=Mode.SUBTRACT)

    # 草图29 → 切除-拉伸6 (cut, through all)
    with BuildSketch(Plane.ZY.offset(76)):
        with Locations((-21, -10)):
            Rectangle(SKETCH_29_W, SKETCH_29_H)
        with Locations((21, -10)):
            Rectangle(SKETCH_29_W, SKETCH_29_H)
    extrude(amount=-CUT_EXTRUDE_6_DEPTH, mode=Mode.SUBTRACT)

    # 圆角1
    fillet_1_edges = [part.edges().sort_by_distance(p)[0] for p in [
        (-74.5, -4, -17.5),
        (-74.5, -16, -17.5),
        (-74.5, -16, -24.5),
        (-74.5, -4, -24.5),
        (-74.5, -4, 24.5),
        (-74.5, -16, 24.5),
        (-74.5, -16, 17.5),
        (-74.5, -4, 17.5),
    ]]
    fillet(fillet_1_edges, radius=FILLET_1_R)

    # 圆角2
    fillet_2_edges = [part.edges().sort_by_distance(p)[0] for p in [
        (74.5, -4, -17.5),
        (74.5, -16, -17.5),
        (74.5, -16, -24.5),
        (74.5, -4, -24.5),
        (74.5, -4, 24.5),
        (74.5, -16, 24.5),
        (74.5, -16, 17.5),
        (74.5, -4, 17.5),
    ]]
    fillet(fillet_2_edges, radius=FILLET_2_R)


solid = part.part
